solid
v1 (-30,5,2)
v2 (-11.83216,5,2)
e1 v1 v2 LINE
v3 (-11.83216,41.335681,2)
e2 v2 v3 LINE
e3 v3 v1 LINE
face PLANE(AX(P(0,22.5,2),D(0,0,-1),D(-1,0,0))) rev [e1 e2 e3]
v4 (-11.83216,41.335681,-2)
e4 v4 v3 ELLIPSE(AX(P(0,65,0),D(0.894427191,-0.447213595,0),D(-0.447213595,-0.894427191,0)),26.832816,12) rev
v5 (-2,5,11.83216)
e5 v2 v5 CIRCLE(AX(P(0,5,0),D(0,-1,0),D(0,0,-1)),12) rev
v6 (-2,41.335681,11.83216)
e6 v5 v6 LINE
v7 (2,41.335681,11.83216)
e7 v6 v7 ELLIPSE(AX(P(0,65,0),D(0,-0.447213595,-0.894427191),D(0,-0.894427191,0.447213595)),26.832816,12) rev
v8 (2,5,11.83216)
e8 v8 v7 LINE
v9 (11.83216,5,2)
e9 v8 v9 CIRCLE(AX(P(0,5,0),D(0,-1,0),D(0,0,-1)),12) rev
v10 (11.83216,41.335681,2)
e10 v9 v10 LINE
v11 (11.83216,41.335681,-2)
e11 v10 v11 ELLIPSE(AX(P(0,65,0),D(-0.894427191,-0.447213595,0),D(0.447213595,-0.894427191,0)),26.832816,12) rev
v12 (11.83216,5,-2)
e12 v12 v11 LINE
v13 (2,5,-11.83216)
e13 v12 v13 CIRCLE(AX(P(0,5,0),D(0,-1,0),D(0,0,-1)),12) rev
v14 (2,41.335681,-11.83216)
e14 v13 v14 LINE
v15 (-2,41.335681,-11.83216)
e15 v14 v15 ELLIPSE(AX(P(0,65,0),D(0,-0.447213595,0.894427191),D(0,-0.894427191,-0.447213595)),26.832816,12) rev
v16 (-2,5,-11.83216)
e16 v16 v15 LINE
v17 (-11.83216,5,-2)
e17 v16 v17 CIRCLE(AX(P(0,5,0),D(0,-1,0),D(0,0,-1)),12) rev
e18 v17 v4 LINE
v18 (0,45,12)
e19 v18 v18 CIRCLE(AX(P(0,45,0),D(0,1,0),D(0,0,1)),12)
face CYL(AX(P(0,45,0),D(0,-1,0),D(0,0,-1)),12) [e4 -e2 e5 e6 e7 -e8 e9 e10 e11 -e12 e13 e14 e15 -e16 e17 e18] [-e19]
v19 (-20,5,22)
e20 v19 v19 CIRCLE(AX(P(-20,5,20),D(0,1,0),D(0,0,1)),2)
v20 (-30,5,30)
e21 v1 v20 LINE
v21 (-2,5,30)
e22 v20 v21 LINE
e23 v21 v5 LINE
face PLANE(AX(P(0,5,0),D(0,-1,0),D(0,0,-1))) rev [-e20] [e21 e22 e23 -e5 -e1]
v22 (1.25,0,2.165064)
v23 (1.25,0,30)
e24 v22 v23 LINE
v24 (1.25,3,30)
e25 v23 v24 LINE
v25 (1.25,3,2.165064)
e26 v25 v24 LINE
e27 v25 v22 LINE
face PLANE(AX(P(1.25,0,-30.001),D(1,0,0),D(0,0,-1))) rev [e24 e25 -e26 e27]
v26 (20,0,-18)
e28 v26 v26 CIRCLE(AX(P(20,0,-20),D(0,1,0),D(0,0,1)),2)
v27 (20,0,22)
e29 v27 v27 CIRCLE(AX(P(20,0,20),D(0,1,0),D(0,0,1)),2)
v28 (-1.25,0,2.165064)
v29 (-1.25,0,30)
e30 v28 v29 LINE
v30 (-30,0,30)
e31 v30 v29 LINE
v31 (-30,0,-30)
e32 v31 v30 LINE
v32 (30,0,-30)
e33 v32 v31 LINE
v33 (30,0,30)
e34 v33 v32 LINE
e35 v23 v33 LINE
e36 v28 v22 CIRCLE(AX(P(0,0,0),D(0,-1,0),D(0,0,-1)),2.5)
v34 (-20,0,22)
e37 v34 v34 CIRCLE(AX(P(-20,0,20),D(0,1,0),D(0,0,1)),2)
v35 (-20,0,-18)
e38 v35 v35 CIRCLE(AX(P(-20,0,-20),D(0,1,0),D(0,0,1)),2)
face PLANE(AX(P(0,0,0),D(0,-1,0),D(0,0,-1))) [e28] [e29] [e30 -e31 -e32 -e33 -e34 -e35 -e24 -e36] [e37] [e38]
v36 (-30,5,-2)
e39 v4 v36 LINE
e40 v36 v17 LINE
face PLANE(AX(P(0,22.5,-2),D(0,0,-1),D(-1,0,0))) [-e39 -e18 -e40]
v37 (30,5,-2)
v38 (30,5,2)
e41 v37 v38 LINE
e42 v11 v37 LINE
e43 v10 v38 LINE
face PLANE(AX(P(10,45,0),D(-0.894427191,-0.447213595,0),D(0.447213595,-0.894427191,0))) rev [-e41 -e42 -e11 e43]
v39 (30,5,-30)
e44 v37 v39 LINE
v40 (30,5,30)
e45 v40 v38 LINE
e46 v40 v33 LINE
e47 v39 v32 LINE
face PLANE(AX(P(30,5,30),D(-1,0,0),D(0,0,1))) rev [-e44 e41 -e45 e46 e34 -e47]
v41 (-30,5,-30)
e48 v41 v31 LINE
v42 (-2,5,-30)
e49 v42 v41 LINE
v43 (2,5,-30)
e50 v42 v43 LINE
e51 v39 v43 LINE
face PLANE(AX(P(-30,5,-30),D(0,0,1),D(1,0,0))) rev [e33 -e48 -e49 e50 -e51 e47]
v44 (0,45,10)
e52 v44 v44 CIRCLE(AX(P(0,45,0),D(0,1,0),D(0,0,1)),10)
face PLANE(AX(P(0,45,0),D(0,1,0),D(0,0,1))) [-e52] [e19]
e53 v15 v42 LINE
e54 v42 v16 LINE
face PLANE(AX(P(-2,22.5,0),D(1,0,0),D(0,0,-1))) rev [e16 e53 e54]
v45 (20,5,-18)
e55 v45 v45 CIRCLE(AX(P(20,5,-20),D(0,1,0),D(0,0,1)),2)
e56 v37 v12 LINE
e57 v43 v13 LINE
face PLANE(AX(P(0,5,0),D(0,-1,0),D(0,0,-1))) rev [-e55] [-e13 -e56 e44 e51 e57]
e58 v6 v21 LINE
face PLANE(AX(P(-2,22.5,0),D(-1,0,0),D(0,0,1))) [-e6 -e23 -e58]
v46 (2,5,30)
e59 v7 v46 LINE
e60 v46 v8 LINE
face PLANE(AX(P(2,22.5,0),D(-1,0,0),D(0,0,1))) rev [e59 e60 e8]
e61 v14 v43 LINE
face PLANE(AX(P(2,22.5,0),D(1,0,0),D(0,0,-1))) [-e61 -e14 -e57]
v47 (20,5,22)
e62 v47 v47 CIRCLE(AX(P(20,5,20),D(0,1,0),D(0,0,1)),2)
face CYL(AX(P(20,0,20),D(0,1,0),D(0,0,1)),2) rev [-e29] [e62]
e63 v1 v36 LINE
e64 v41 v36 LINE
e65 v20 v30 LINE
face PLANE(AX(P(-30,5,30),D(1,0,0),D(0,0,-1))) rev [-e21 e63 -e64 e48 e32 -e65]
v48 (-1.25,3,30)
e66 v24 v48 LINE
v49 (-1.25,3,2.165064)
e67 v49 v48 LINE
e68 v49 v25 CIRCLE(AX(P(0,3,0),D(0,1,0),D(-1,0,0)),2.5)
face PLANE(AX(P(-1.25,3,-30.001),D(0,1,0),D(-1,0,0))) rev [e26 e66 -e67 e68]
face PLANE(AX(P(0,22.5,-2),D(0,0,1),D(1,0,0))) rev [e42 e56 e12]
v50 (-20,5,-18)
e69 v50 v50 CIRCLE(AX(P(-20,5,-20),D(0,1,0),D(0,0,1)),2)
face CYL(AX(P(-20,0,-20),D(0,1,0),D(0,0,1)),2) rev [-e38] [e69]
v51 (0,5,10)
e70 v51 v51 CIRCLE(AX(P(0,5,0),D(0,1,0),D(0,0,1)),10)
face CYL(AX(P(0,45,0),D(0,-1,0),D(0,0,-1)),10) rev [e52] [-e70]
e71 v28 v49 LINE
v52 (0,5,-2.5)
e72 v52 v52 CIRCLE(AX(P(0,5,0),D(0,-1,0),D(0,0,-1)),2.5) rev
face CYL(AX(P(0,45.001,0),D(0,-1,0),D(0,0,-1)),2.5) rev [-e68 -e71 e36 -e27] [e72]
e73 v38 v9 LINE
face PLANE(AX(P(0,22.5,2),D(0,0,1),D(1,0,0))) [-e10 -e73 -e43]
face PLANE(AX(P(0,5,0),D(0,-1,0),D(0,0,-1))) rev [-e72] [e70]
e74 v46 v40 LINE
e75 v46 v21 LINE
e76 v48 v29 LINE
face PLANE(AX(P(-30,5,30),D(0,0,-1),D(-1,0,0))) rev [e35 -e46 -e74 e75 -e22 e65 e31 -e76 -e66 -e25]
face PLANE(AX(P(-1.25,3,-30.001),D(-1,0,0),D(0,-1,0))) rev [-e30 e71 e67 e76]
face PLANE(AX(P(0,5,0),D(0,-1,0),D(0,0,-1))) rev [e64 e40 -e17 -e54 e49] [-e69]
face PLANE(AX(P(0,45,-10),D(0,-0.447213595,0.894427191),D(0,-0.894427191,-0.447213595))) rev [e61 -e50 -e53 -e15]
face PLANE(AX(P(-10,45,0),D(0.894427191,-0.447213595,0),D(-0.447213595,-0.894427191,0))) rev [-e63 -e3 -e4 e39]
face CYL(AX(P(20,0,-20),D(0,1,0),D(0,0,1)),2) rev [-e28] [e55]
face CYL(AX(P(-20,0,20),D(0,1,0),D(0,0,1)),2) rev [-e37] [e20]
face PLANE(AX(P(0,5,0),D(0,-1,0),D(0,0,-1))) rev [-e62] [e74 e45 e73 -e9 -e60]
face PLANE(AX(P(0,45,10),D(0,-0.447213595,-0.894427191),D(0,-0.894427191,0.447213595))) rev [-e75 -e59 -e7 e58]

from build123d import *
from build123d.topology import SkipClean

# Parameters (mm, degrees)
BASISVLAK_W          = 60
BASISVLAK_H          = 60
BASIS_DEPTH          = 5
CIRKELS_HOUDER_R     = 12
CIRKELS_HOUDER_R_2   = 10
HOUDER_DEPTH         = 40
CIRKEL_GAT_R         = 2
GATEN_DEPTH          = 59.309518948
GAT_KABELS_REACH     = 63.847
CIRKEL_GAT_KABELS_R  = 2.5
RIBBE_START          = -2
RIBBE_DEPTH          = 4
RIBBEN_PATROON_COUNT = 4
GLEUF_REACH          = 82.777
GLEUF_END_RADIUS     = 2.5
VIERKANT_BASIS_W     = 2.5
VIERKANT_BASIS_H     = 3


# Read off the part's stored shape, not the designer's step: Ribbe
with BuildPart() as part:
    # Basisvlak → Basis (new body)
    with BuildSketch(Plane(origin=(0, 0, 0), x_dir=(1, 0, 0), z_dir=(0, 1, 0))):
        Rectangle(BASISVLAK_W, BASISVLAK_H)
    extrude(amount=BASIS_DEPTH)

    # Cirkels houder → Houder (add)
    with BuildSketch(Plane(origin=(0, 5, 0), x_dir=(1, 0, 0), z_dir=(0, 1, 0))):
        with Locations(Location((0, 0, 0), (0, 0, 90))):
            Circle(CIRKELS_HOUDER_R)
        with Locations(Location((0, 0, 0), (0, 0, 270))):
            Circle(CIRKELS_HOUDER_R_2, mode=Mode.SUBTRACT)
    extrude(amount=HOUDER_DEPTH)

    # Cirkel gat → Gaten (cut, through all)
    with BuildSketch(Plane(origin=(0, 5, 0), x_dir=(1, 0, 0), z_dir=(0, 1, 0))):
        with Locations(Location((-20, -20, 0), (0, 0, 270))):
            Circle(CIRKEL_GAT_R)
        with Locations(Location((20, -20, 0), (0, 0, 270))):
            Circle(CIRKEL_GAT_R)
        with Locations(Location((-20, 20, 0), (0, 0, 270))):
            Circle(CIRKEL_GAT_R)
        with Locations(Location((20, 20, 0), (0, 0, 270))):
            Circle(CIRKEL_GAT_R)
    extrude(amount=-GATEN_DEPTH, mode=Mode.SUBTRACT)

    # Cirkel gat kabels → Gat kabels (cut, up to next)
    with BuildSketch(Plane(origin=(0, 0, 0), x_dir=(-1, 0, 0), z_dir=(0, -1, 0)), mode=Mode.PRIVATE) as gat_kabels_sk1:
        with Locations(Location((0, 0, 0), (0, 0, 90))):
            Circle(CIRKEL_GAT_KABELS_R)
    gat_kabels_tool1 = extrude(gat_kabels_sk1.sketch, amount=-GAT_KABELS_REACH, mode=Mode.PRIVATE) & part.part
    add(gat_kabels_tool1.solids().sort_by_distance((0, 0, 0))[0], mode=Mode.SUBTRACT)

    # Ribbe outline → Ribbe (add)
    with BuildSketch(Plane(origin=(0, 0, 0), x_dir=(0, 0, -1), z_dir=(1, 0, 0)).offset(RIBBE_START)):
        Polygon((30, 5), (11, 43), (10, 43), (10, 5), align=None)
    ribbe = extrude(amount=RIBBE_DEPTH)

    # Ribben patroon: Ribbe ×4 about axis
    with SkipClean():  # the faces are left unmerged after this step: merging them gives an invalid solid
        ribben_patroon_axis = Axis((0, 0, 0), (0, 1, 0))
        for i in range(1, RIBBEN_PATROON_COUNT):
            add(ribbe.rotate(ribben_patroon_axis, i * 360 / RIBBEN_PATROON_COUNT))

    # Gleuf: up to this cylinder (the profile starts outside it)
    with SkipClean():  # the faces are left unmerged after this step: merging them gives an invalid solid
        gleuf_end = Plane(origin=(0, 1.5, 0), z_dir=(0, -1, 0)) * Cylinder(GLEUF_END_RADIUS, 171.554, mode=Mode.PRIVATE)
        # vierkant_basis → Gleuf (cut, up to the surface)
        with BuildSketch(Plane.XY.offset(30), mode=Mode.PRIVATE) as gleuf_sk1:
            with Locations((0, 1.5)):
                Rectangle(VIERKANT_BASIS_W, VIERKANT_BASIS_H)
        gleuf_tool1 = extrude(gleuf_sk1.sketch, amount=-GLEUF_REACH, mode=Mode.PRIVATE) - gleuf_end
        add(gleuf_tool1.solids().sort_by_distance((0, 1.5, 30))[0], mode=Mode.SUBTRACT)


solid = part.part
